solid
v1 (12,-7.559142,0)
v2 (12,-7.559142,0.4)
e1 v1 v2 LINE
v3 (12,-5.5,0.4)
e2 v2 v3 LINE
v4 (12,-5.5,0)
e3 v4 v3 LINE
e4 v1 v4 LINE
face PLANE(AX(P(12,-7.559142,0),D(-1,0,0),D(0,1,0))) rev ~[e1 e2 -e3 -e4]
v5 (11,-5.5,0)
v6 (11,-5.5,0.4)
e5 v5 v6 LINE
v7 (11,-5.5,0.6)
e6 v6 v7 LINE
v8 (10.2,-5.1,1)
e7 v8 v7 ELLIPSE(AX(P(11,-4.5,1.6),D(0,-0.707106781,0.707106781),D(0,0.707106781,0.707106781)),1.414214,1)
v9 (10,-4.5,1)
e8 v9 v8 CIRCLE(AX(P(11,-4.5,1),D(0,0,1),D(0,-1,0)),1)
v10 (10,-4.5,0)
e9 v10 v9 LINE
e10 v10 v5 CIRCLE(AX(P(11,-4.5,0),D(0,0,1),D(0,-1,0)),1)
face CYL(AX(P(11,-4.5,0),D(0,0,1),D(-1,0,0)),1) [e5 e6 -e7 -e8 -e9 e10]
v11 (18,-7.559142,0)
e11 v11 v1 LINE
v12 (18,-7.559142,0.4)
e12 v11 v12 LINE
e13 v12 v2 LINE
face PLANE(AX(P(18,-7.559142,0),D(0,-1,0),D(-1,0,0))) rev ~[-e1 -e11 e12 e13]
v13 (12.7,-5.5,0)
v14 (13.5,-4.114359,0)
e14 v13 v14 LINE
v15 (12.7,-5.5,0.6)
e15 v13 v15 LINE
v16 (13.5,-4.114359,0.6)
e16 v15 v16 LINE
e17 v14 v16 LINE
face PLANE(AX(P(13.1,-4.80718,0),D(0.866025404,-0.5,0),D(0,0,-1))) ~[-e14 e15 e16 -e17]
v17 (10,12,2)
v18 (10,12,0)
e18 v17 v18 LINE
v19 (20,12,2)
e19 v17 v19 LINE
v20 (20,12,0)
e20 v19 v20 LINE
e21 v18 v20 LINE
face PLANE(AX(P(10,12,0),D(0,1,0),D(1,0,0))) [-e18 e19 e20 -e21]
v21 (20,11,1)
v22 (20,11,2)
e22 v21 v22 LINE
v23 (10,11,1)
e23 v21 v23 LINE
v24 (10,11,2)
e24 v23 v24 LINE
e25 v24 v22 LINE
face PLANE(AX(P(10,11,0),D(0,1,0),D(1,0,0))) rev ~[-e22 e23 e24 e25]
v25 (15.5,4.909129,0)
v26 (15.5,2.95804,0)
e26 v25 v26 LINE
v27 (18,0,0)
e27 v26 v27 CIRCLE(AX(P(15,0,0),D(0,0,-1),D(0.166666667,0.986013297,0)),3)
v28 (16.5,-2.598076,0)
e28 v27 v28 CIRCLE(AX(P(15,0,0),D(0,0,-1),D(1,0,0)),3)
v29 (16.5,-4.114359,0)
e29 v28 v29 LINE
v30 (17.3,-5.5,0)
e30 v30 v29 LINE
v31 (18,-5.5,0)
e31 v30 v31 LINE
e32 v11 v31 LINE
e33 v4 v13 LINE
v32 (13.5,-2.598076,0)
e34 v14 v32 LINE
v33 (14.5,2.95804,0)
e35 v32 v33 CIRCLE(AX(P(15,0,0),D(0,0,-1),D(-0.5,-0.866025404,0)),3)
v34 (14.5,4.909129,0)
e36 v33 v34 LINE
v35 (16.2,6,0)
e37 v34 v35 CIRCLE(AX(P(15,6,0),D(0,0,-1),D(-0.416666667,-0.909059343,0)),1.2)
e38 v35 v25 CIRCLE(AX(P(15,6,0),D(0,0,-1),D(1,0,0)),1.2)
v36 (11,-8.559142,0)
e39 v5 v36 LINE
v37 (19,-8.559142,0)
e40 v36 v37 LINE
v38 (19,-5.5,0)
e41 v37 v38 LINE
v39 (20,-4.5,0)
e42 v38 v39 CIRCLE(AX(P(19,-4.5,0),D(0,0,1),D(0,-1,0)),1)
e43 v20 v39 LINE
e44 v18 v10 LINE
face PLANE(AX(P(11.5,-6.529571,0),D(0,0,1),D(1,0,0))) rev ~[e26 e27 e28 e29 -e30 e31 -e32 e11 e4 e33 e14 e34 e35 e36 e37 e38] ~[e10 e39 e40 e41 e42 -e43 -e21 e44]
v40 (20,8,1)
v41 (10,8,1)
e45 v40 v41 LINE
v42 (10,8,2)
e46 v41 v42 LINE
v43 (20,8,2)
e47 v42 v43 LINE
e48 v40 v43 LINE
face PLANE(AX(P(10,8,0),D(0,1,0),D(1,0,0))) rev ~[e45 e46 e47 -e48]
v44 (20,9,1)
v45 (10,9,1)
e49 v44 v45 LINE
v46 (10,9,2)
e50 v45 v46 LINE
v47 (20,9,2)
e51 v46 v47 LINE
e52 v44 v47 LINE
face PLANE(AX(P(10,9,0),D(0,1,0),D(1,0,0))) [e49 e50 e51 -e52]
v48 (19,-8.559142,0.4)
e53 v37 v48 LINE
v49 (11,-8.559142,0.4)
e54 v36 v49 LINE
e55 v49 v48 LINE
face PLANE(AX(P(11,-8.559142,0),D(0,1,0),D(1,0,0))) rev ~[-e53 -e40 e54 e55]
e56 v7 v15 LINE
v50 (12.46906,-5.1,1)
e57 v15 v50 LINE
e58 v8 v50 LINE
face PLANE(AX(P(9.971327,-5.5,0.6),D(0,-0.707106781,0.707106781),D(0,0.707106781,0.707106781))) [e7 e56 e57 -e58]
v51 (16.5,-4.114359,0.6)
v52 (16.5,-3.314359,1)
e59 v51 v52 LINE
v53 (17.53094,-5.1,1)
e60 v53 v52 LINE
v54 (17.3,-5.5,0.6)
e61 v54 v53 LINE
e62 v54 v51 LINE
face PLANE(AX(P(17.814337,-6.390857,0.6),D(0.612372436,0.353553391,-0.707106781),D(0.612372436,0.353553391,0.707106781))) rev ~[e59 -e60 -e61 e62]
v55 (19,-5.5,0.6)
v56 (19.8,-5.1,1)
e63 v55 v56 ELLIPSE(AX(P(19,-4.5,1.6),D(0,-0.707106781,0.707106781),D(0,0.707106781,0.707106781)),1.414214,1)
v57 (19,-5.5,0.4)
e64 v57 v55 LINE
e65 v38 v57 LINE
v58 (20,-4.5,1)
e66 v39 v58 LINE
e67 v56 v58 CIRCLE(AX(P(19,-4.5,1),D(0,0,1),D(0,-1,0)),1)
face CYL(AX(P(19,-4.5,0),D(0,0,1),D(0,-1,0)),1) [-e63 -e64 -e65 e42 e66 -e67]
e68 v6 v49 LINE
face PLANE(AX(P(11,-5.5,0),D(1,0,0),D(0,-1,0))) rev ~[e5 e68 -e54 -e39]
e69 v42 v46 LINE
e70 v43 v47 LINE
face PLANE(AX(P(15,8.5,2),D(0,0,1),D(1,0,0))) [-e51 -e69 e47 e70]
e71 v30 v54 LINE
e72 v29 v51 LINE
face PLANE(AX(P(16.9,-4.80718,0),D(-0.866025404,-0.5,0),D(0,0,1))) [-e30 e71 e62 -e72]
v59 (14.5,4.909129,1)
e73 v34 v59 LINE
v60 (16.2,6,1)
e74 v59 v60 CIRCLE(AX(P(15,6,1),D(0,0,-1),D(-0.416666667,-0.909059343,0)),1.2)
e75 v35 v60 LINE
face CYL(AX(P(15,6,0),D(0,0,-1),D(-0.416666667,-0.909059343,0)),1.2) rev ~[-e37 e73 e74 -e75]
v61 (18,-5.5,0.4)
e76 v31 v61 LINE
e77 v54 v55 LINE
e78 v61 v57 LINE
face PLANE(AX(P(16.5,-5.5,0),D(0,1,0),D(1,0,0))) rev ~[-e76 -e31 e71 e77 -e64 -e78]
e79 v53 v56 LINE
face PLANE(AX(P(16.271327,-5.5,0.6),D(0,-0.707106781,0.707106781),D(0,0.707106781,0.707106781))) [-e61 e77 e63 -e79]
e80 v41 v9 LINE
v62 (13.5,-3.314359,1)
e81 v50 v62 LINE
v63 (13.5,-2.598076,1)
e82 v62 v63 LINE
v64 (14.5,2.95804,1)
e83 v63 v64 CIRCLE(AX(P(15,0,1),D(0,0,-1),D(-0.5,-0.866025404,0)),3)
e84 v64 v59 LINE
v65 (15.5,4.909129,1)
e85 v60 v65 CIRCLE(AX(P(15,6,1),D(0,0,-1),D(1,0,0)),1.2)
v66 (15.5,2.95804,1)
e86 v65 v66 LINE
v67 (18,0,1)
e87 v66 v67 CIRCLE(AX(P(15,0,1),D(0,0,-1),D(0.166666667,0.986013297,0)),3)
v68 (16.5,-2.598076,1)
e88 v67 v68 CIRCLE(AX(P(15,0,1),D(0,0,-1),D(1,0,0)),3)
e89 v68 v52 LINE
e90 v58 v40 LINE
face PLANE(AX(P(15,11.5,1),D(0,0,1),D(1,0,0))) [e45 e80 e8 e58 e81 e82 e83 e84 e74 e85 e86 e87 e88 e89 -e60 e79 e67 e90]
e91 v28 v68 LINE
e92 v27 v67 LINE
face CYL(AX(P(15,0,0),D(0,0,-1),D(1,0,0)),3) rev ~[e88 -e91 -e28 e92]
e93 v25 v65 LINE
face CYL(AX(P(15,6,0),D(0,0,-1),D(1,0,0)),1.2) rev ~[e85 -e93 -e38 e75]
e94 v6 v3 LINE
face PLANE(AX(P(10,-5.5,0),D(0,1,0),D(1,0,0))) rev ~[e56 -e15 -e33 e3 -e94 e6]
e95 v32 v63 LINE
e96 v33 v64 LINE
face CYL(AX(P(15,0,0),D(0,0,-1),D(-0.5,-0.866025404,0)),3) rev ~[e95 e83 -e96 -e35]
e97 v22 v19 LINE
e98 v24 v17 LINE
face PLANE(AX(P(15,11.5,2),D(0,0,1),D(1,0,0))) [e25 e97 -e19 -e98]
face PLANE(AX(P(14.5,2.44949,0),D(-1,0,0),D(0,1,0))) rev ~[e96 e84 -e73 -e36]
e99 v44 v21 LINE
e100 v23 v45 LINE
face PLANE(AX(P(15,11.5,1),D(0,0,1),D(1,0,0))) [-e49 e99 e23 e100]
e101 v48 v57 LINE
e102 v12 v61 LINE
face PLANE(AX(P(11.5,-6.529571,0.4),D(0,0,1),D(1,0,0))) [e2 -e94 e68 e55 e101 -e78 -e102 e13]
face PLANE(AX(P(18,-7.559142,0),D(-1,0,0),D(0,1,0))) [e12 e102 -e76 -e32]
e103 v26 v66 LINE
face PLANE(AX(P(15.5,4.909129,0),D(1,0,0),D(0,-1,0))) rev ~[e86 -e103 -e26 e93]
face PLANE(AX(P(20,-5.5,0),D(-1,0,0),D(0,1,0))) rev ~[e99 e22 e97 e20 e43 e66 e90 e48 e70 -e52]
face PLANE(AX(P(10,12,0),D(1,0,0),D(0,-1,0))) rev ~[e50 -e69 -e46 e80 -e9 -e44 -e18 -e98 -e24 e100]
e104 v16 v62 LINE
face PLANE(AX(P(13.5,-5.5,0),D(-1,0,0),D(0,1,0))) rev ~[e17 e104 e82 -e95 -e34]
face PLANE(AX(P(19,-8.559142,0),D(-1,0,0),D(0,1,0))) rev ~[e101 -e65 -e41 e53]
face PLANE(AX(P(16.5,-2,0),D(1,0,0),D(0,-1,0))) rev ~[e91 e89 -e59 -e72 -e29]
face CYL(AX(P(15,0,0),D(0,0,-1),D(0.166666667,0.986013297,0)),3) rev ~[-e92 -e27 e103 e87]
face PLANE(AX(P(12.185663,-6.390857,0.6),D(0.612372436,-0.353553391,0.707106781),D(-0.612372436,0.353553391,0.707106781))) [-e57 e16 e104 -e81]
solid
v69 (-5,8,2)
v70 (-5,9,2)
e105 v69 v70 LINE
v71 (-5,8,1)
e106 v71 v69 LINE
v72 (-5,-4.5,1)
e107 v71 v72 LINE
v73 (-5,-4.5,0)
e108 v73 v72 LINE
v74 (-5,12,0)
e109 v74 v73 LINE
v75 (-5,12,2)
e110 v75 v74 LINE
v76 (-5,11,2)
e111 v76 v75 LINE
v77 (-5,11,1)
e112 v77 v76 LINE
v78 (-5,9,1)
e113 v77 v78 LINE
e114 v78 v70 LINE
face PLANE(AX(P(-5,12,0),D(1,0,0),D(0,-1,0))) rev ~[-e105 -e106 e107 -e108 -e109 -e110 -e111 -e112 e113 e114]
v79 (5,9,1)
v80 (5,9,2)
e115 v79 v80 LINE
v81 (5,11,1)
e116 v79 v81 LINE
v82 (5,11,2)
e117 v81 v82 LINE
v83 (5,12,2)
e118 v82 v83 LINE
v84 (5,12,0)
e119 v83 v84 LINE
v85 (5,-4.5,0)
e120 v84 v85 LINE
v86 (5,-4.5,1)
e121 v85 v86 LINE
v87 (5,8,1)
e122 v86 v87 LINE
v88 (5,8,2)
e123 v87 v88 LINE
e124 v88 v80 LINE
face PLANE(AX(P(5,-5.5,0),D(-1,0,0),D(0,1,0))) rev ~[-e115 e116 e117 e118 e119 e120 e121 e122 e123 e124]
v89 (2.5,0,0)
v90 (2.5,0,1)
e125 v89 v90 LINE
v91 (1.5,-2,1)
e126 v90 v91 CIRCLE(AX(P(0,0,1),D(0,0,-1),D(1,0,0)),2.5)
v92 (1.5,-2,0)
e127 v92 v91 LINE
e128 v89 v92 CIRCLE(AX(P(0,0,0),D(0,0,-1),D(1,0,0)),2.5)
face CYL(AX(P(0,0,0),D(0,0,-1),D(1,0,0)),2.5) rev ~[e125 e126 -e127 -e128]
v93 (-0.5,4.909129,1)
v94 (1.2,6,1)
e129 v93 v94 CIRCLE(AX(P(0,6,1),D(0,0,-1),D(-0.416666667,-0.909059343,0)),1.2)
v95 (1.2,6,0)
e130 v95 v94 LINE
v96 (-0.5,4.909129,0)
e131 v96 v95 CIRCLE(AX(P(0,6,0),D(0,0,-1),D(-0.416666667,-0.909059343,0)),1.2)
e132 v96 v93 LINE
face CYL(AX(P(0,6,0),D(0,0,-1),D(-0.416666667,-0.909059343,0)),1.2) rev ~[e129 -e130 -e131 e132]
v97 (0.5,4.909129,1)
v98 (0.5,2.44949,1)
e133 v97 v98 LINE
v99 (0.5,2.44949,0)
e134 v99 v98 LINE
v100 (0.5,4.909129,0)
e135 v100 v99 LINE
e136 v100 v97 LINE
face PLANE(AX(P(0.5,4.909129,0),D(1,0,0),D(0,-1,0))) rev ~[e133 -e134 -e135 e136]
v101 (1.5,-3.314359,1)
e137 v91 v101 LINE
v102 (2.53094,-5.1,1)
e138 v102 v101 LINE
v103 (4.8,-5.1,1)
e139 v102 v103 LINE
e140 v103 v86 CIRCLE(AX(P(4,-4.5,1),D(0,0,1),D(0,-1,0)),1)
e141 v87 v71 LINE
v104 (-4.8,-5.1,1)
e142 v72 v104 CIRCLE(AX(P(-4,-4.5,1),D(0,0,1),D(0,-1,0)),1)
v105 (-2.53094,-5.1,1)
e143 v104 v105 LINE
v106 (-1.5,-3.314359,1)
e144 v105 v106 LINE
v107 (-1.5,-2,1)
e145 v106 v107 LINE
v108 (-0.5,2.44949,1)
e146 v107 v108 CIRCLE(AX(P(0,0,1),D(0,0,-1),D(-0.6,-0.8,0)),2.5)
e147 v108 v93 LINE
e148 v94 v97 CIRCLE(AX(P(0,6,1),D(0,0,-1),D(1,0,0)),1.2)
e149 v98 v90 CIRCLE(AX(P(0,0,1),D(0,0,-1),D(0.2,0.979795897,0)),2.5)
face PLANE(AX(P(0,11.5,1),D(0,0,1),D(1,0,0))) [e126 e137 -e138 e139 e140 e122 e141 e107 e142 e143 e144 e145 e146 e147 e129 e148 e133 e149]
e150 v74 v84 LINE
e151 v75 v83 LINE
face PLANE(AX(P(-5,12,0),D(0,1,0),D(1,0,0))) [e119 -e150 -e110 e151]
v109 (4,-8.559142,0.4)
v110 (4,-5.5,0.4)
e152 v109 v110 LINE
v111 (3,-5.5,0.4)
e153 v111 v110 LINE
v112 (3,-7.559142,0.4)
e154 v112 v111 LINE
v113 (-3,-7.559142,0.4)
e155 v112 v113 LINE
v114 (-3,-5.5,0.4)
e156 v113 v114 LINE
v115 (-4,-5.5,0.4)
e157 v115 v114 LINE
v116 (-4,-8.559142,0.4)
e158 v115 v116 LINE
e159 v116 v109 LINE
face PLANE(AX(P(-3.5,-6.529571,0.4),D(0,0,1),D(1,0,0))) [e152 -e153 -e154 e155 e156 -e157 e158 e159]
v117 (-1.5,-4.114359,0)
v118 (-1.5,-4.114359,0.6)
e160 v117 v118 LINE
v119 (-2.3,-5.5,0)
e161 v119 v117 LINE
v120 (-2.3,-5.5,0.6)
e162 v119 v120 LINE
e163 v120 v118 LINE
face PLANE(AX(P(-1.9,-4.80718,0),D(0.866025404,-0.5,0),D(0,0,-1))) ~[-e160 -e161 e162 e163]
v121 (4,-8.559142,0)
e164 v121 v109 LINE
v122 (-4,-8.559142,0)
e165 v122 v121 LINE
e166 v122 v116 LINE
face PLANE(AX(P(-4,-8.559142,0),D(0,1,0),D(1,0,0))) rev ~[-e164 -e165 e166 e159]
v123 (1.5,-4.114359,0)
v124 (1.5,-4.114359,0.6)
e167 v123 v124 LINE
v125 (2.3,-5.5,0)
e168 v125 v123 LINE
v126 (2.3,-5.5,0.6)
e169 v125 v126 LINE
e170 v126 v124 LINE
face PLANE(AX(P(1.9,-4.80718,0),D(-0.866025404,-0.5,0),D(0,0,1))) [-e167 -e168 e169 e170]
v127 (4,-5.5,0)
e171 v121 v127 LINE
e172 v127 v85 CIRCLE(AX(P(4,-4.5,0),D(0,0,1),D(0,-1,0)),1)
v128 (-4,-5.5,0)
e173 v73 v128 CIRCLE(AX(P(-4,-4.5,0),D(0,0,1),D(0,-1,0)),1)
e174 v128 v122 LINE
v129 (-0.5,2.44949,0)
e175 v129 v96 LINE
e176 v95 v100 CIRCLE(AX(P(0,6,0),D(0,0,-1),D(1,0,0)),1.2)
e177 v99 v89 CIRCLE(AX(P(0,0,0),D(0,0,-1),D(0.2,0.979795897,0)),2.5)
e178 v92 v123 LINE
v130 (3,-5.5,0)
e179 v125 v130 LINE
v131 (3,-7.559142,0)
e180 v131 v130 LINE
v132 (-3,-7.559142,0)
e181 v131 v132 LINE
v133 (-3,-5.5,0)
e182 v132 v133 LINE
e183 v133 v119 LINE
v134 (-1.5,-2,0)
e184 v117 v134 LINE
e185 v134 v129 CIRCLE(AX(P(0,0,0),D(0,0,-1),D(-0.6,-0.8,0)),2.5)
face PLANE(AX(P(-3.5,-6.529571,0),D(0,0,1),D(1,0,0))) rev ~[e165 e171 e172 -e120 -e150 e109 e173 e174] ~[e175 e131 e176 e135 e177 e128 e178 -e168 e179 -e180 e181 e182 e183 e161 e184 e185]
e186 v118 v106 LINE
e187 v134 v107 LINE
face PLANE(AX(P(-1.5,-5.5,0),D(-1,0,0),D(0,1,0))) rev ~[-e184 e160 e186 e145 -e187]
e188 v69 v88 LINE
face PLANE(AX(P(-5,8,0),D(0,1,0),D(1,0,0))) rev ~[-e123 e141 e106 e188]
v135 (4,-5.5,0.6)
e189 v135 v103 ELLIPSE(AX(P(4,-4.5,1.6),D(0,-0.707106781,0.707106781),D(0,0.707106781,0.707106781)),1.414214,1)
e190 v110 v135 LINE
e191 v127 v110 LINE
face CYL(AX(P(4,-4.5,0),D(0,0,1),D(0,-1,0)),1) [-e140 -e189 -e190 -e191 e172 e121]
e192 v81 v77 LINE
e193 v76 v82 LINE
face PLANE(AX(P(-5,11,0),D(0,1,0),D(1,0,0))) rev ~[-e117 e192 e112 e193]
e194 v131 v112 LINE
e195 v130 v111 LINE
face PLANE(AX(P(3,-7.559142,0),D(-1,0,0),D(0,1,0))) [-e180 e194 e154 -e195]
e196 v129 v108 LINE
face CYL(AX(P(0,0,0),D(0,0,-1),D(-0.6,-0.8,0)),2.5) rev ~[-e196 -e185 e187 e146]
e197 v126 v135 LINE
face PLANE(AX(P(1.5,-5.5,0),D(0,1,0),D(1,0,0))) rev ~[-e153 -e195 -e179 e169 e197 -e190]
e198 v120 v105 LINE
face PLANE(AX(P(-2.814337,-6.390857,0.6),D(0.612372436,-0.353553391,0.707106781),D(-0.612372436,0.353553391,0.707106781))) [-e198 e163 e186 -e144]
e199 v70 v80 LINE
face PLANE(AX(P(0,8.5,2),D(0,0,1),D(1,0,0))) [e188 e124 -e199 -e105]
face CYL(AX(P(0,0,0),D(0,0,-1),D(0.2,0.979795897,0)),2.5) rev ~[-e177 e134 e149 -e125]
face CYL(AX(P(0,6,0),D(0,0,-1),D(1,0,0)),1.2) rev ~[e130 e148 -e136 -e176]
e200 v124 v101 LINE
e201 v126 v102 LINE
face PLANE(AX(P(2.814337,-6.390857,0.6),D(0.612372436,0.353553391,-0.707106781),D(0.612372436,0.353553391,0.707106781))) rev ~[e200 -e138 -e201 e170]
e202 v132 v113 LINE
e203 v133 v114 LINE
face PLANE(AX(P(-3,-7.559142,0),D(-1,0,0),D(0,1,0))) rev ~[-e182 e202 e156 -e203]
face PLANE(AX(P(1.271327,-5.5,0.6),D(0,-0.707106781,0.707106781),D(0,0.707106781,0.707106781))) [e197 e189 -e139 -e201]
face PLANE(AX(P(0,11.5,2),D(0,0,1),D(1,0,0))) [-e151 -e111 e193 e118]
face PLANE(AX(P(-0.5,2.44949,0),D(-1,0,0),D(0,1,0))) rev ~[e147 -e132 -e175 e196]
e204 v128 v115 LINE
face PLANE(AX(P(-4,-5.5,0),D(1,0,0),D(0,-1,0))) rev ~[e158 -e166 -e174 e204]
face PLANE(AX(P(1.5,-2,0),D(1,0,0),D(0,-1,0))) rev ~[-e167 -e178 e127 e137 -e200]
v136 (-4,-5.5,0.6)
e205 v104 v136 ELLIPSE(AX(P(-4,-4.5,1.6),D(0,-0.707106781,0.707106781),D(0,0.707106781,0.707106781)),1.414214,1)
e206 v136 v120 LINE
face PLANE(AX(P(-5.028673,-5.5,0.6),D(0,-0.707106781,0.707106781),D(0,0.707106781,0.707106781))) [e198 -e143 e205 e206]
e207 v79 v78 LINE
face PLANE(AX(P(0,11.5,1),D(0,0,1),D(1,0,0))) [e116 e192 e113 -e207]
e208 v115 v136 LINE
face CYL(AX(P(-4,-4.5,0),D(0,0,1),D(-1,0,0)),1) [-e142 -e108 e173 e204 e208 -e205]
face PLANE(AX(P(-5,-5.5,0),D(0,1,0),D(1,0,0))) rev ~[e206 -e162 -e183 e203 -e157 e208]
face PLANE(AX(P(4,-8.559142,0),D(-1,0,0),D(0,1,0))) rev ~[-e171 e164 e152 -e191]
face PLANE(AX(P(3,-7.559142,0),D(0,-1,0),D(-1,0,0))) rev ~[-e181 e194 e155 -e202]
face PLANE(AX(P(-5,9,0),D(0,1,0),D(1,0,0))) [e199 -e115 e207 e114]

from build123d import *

# Parameters (mm, degrees)
F0_W        = 10
F0_H        = 1
F0_H_2      = 2
F1_DEPTH    = 1
F2_DEPTH    = 2
F3_R        = 1
F4_SIZE2    = 1.3856406461
F4_SIZE     = 0.8
F5_SIZE2    = 1.3856406461
F5_SIZE     = 0.8
F6_T1_DEPTH = 3.7573463904
F6_T3_DEPTH = 3.7573463904
F6_T5_DEPTH = 3.6573463904
F6_T7_DEPTH = 3.6573463904
F0_W_2      = 1
F0_H_3      = 2.0591422394
F7_DEPTH    = 0.4
F10_DEPTH   = 2


# Not quite as in the source:
# - a fillet or chamfer that OpenCascade refuses, or shapes differently, is made with other operations: its cross-section is extruded or revolved along the edge and cut away or added


with BuildPart() as f1:
    # F0 (on Top) → F1 (new body)
    with BuildSketch(Plane.XY):
        with Locations((0, 11.5)):
            Rectangle(F0_W, F0_H)
        with Locations((0, 10)):
            Rectangle(F0_W, F0_H_2)
        with Locations((0, 8.5)):
            Rectangle(F0_W, F0_H)
        with BuildLine():
            ThreePointArc((0.5, 2.4494897428), (1.9364916731, 1.5811388301), (2.5, 0))
            ThreePointArc((2.5, 0), (2.2360679775, -1.1180339887), (1.5, -2))
            Line((1.5, -2), (1.5, -5.5))
            Line((1.5, -5.5), (3, -5.5))
            Line((3, -5.5), (4, -5.5))
            Line((4, -5.5), (5, -5.5))
            Line((5, -5.5), (5, 8))
            Line((5, 8), (-5, 8))
            Line((-5, 8), (-5, -5.5))
            Line((-5, -5.5), (-4, -5.5))
            Line((-4, -5.5), (-3, -5.5))
            Line((-3, -5.5), (-1.5, -5.5))
            Line((-1.5, -5.5), (-1.5, -2))
            ThreePointArc((-1.5, -2), (-2.4391575888, 0.5481881586), (-0.5, 2.4494897428))
            Line((-0.5, 2.4494897428), (-0.5, 4.9091287885))
            ThreePointArc((-0.5, 4.9091287885), (-0.6480740698, 7.0099504938), (1.2, 6))
            ThreePointArc((1.2, 6), (1.0099504938, 5.3519259302), (0.5, 4.9091287885))
            Line((0.5, 4.9091287885), (0.5, 2.4494897428))
        make_face()
    extrude(amount=F1_DEPTH)

    # F0 (on Top) → F2 (join)
    with BuildSketch(Plane.XY):
        with Locations((0, 11.5)):
            Rectangle(F0_W, F0_H)
        with Locations((0, 8.5)):
            Rectangle(F0_W, F0_H)
    extrude(amount=F2_DEPTH)

    # F3
    f3_edges = [f1.edges().sort_by_distance(p)[0] for p in [
        (-5, -5.5, 0.5),
        (5, -5.5, 0.5),
    ]]
    fillet(f3_edges, radius=F3_R)

    # F4
    f4_edges = [f1.edges().sort_by_distance(p)[0] for p in [
        (-1.5, -5.5, 0.5),
    ]]
    f4_side = f1.faces().sort_by_distance((-2.75, -5.5, 0.5))[0]
    chamfer(f4_edges, length=F4_SIZE, length2=F4_SIZE2, reference=f4_side)

    # F5
    f5_edges = [f1.edges().sort_by_distance(p)[0] for p in [
        (1.5, -5.5, 0.5),
    ]]
    f5_side = f1.faces().sort_by_distance((2.75, -5.5, 0.5))[0]
    chamfer(f5_edges, length=F5_SIZE, length2=F5_SIZE2, reference=f5_side)

    # F6: chamfer of 0.4 on 4 edges, made by hand

    # F6_s2 → F6_t1 (cut)
    with BuildSketch(Plane.YZ.offset(-5.0286731952)):
        Polygon((-5.5, 0.6), (-5.1, 1), (-5.5, 1), align=None)
    extrude(amount=F6_T1_DEPTH, mode=Mode.SUBTRACT)

    # F6_s4 → F6_t3 (cut)
    with BuildSketch(Plane.YZ.offset(1.2713268048)):
        Polygon((-5.5, 0.6), (-5.1, 1), (-5.5, 1), align=None)
    extrude(amount=F6_T3_DEPTH, mode=Mode.SUBTRACT)

    # F6_s6 → F6_t5 (cut)
    with BuildSketch(Plane(origin=(-3.470906458, -6.0117863336, 0), x_dir=(0, 0, 1), z_dir=(0.5, 0.8660254038, 0))):
        Polygon((0.6, 0.7581415713), (1, 0.3581415713), (1, 0.7581415713), align=None)
    extrude(amount=F6_T5_DEPTH, mode=Mode.SUBTRACT)

    # F6_s8 → F6_t7 (cut)
    with BuildSketch(Plane(origin=(3.470906458, -6.0117863336, 0), x_dir=(0, 0, 1), z_dir=(-0.5, 0.8660254038, 0))):
        Polygon((0.6, -0.7581415713), (1, -0.3581415713), (1, -0.7581415713), align=None)
    extrude(amount=F6_T7_DEPTH, mode=Mode.SUBTRACT)

    # F0 (on Top) → F7 (join)
    with BuildSketch(Plane.XY):
        with Locations((-3.5, -6.5295711197)):
            Rectangle(F0_W_2, F0_H_3)
        Polygon((4, -7.5591422394), (3, -7.5591422394), (-3, -7.5591422394), (-4, -7.5591422394), (-4, -8.5591422394), (4, -8.5591422394), align=None)
        with Locations((3.5, -6.5295711197)):
            Rectangle(F0_W_2, F0_H_3)
    extrude(amount=F7_DEPTH)


with BuildPart() as f8_1:
    # F8: copy of F1
    add(f1.part.moved(Location((15, 0, 0))))

    # F9 (on face) → F10 (cut)
    with BuildSketch(Plane(origin=(0, 0, 0), x_dir=(1, 0, 0), z_dir=(0, 0, -1))):
        with BuildLine():
            ThreePointArc((15.5, -2.9580398915), (17.2912878475, -1.9364916731), (18, 0))
            ThreePointArc((18, 0), (17.5980762114, 1.5), (16.5, 2.5980762114))
            Line((16.5, 2.5980762114), (16.5, 2))
            ThreePointArc((16.5, 2), (17.4391575888, -0.5481881586), (15.5, -2.4494897428))
            Line((15.5, -2.4494897428), (15.5, -2.9580398915))
        make_face()
        with BuildLine():
            Line((13.5, 2), (13.5, 2.5980762114))
            ThreePointArc((13.5, 2.5980762114), (12.0474406801, -0.5314070594), (14.5, -2.9580398915))
            Line((14.5, -2.9580398915), (14.5, -2.4494897428))
            ThreePointArc((14.5, -2.4494897428), (12.5608424112, -0.5481881586), (13.5, 2))
        make_face()
    extrude(amount=-F10_DEPTH, mode=Mode.SUBTRACT)


solid = Compound([f1.part, f8_1.part])
